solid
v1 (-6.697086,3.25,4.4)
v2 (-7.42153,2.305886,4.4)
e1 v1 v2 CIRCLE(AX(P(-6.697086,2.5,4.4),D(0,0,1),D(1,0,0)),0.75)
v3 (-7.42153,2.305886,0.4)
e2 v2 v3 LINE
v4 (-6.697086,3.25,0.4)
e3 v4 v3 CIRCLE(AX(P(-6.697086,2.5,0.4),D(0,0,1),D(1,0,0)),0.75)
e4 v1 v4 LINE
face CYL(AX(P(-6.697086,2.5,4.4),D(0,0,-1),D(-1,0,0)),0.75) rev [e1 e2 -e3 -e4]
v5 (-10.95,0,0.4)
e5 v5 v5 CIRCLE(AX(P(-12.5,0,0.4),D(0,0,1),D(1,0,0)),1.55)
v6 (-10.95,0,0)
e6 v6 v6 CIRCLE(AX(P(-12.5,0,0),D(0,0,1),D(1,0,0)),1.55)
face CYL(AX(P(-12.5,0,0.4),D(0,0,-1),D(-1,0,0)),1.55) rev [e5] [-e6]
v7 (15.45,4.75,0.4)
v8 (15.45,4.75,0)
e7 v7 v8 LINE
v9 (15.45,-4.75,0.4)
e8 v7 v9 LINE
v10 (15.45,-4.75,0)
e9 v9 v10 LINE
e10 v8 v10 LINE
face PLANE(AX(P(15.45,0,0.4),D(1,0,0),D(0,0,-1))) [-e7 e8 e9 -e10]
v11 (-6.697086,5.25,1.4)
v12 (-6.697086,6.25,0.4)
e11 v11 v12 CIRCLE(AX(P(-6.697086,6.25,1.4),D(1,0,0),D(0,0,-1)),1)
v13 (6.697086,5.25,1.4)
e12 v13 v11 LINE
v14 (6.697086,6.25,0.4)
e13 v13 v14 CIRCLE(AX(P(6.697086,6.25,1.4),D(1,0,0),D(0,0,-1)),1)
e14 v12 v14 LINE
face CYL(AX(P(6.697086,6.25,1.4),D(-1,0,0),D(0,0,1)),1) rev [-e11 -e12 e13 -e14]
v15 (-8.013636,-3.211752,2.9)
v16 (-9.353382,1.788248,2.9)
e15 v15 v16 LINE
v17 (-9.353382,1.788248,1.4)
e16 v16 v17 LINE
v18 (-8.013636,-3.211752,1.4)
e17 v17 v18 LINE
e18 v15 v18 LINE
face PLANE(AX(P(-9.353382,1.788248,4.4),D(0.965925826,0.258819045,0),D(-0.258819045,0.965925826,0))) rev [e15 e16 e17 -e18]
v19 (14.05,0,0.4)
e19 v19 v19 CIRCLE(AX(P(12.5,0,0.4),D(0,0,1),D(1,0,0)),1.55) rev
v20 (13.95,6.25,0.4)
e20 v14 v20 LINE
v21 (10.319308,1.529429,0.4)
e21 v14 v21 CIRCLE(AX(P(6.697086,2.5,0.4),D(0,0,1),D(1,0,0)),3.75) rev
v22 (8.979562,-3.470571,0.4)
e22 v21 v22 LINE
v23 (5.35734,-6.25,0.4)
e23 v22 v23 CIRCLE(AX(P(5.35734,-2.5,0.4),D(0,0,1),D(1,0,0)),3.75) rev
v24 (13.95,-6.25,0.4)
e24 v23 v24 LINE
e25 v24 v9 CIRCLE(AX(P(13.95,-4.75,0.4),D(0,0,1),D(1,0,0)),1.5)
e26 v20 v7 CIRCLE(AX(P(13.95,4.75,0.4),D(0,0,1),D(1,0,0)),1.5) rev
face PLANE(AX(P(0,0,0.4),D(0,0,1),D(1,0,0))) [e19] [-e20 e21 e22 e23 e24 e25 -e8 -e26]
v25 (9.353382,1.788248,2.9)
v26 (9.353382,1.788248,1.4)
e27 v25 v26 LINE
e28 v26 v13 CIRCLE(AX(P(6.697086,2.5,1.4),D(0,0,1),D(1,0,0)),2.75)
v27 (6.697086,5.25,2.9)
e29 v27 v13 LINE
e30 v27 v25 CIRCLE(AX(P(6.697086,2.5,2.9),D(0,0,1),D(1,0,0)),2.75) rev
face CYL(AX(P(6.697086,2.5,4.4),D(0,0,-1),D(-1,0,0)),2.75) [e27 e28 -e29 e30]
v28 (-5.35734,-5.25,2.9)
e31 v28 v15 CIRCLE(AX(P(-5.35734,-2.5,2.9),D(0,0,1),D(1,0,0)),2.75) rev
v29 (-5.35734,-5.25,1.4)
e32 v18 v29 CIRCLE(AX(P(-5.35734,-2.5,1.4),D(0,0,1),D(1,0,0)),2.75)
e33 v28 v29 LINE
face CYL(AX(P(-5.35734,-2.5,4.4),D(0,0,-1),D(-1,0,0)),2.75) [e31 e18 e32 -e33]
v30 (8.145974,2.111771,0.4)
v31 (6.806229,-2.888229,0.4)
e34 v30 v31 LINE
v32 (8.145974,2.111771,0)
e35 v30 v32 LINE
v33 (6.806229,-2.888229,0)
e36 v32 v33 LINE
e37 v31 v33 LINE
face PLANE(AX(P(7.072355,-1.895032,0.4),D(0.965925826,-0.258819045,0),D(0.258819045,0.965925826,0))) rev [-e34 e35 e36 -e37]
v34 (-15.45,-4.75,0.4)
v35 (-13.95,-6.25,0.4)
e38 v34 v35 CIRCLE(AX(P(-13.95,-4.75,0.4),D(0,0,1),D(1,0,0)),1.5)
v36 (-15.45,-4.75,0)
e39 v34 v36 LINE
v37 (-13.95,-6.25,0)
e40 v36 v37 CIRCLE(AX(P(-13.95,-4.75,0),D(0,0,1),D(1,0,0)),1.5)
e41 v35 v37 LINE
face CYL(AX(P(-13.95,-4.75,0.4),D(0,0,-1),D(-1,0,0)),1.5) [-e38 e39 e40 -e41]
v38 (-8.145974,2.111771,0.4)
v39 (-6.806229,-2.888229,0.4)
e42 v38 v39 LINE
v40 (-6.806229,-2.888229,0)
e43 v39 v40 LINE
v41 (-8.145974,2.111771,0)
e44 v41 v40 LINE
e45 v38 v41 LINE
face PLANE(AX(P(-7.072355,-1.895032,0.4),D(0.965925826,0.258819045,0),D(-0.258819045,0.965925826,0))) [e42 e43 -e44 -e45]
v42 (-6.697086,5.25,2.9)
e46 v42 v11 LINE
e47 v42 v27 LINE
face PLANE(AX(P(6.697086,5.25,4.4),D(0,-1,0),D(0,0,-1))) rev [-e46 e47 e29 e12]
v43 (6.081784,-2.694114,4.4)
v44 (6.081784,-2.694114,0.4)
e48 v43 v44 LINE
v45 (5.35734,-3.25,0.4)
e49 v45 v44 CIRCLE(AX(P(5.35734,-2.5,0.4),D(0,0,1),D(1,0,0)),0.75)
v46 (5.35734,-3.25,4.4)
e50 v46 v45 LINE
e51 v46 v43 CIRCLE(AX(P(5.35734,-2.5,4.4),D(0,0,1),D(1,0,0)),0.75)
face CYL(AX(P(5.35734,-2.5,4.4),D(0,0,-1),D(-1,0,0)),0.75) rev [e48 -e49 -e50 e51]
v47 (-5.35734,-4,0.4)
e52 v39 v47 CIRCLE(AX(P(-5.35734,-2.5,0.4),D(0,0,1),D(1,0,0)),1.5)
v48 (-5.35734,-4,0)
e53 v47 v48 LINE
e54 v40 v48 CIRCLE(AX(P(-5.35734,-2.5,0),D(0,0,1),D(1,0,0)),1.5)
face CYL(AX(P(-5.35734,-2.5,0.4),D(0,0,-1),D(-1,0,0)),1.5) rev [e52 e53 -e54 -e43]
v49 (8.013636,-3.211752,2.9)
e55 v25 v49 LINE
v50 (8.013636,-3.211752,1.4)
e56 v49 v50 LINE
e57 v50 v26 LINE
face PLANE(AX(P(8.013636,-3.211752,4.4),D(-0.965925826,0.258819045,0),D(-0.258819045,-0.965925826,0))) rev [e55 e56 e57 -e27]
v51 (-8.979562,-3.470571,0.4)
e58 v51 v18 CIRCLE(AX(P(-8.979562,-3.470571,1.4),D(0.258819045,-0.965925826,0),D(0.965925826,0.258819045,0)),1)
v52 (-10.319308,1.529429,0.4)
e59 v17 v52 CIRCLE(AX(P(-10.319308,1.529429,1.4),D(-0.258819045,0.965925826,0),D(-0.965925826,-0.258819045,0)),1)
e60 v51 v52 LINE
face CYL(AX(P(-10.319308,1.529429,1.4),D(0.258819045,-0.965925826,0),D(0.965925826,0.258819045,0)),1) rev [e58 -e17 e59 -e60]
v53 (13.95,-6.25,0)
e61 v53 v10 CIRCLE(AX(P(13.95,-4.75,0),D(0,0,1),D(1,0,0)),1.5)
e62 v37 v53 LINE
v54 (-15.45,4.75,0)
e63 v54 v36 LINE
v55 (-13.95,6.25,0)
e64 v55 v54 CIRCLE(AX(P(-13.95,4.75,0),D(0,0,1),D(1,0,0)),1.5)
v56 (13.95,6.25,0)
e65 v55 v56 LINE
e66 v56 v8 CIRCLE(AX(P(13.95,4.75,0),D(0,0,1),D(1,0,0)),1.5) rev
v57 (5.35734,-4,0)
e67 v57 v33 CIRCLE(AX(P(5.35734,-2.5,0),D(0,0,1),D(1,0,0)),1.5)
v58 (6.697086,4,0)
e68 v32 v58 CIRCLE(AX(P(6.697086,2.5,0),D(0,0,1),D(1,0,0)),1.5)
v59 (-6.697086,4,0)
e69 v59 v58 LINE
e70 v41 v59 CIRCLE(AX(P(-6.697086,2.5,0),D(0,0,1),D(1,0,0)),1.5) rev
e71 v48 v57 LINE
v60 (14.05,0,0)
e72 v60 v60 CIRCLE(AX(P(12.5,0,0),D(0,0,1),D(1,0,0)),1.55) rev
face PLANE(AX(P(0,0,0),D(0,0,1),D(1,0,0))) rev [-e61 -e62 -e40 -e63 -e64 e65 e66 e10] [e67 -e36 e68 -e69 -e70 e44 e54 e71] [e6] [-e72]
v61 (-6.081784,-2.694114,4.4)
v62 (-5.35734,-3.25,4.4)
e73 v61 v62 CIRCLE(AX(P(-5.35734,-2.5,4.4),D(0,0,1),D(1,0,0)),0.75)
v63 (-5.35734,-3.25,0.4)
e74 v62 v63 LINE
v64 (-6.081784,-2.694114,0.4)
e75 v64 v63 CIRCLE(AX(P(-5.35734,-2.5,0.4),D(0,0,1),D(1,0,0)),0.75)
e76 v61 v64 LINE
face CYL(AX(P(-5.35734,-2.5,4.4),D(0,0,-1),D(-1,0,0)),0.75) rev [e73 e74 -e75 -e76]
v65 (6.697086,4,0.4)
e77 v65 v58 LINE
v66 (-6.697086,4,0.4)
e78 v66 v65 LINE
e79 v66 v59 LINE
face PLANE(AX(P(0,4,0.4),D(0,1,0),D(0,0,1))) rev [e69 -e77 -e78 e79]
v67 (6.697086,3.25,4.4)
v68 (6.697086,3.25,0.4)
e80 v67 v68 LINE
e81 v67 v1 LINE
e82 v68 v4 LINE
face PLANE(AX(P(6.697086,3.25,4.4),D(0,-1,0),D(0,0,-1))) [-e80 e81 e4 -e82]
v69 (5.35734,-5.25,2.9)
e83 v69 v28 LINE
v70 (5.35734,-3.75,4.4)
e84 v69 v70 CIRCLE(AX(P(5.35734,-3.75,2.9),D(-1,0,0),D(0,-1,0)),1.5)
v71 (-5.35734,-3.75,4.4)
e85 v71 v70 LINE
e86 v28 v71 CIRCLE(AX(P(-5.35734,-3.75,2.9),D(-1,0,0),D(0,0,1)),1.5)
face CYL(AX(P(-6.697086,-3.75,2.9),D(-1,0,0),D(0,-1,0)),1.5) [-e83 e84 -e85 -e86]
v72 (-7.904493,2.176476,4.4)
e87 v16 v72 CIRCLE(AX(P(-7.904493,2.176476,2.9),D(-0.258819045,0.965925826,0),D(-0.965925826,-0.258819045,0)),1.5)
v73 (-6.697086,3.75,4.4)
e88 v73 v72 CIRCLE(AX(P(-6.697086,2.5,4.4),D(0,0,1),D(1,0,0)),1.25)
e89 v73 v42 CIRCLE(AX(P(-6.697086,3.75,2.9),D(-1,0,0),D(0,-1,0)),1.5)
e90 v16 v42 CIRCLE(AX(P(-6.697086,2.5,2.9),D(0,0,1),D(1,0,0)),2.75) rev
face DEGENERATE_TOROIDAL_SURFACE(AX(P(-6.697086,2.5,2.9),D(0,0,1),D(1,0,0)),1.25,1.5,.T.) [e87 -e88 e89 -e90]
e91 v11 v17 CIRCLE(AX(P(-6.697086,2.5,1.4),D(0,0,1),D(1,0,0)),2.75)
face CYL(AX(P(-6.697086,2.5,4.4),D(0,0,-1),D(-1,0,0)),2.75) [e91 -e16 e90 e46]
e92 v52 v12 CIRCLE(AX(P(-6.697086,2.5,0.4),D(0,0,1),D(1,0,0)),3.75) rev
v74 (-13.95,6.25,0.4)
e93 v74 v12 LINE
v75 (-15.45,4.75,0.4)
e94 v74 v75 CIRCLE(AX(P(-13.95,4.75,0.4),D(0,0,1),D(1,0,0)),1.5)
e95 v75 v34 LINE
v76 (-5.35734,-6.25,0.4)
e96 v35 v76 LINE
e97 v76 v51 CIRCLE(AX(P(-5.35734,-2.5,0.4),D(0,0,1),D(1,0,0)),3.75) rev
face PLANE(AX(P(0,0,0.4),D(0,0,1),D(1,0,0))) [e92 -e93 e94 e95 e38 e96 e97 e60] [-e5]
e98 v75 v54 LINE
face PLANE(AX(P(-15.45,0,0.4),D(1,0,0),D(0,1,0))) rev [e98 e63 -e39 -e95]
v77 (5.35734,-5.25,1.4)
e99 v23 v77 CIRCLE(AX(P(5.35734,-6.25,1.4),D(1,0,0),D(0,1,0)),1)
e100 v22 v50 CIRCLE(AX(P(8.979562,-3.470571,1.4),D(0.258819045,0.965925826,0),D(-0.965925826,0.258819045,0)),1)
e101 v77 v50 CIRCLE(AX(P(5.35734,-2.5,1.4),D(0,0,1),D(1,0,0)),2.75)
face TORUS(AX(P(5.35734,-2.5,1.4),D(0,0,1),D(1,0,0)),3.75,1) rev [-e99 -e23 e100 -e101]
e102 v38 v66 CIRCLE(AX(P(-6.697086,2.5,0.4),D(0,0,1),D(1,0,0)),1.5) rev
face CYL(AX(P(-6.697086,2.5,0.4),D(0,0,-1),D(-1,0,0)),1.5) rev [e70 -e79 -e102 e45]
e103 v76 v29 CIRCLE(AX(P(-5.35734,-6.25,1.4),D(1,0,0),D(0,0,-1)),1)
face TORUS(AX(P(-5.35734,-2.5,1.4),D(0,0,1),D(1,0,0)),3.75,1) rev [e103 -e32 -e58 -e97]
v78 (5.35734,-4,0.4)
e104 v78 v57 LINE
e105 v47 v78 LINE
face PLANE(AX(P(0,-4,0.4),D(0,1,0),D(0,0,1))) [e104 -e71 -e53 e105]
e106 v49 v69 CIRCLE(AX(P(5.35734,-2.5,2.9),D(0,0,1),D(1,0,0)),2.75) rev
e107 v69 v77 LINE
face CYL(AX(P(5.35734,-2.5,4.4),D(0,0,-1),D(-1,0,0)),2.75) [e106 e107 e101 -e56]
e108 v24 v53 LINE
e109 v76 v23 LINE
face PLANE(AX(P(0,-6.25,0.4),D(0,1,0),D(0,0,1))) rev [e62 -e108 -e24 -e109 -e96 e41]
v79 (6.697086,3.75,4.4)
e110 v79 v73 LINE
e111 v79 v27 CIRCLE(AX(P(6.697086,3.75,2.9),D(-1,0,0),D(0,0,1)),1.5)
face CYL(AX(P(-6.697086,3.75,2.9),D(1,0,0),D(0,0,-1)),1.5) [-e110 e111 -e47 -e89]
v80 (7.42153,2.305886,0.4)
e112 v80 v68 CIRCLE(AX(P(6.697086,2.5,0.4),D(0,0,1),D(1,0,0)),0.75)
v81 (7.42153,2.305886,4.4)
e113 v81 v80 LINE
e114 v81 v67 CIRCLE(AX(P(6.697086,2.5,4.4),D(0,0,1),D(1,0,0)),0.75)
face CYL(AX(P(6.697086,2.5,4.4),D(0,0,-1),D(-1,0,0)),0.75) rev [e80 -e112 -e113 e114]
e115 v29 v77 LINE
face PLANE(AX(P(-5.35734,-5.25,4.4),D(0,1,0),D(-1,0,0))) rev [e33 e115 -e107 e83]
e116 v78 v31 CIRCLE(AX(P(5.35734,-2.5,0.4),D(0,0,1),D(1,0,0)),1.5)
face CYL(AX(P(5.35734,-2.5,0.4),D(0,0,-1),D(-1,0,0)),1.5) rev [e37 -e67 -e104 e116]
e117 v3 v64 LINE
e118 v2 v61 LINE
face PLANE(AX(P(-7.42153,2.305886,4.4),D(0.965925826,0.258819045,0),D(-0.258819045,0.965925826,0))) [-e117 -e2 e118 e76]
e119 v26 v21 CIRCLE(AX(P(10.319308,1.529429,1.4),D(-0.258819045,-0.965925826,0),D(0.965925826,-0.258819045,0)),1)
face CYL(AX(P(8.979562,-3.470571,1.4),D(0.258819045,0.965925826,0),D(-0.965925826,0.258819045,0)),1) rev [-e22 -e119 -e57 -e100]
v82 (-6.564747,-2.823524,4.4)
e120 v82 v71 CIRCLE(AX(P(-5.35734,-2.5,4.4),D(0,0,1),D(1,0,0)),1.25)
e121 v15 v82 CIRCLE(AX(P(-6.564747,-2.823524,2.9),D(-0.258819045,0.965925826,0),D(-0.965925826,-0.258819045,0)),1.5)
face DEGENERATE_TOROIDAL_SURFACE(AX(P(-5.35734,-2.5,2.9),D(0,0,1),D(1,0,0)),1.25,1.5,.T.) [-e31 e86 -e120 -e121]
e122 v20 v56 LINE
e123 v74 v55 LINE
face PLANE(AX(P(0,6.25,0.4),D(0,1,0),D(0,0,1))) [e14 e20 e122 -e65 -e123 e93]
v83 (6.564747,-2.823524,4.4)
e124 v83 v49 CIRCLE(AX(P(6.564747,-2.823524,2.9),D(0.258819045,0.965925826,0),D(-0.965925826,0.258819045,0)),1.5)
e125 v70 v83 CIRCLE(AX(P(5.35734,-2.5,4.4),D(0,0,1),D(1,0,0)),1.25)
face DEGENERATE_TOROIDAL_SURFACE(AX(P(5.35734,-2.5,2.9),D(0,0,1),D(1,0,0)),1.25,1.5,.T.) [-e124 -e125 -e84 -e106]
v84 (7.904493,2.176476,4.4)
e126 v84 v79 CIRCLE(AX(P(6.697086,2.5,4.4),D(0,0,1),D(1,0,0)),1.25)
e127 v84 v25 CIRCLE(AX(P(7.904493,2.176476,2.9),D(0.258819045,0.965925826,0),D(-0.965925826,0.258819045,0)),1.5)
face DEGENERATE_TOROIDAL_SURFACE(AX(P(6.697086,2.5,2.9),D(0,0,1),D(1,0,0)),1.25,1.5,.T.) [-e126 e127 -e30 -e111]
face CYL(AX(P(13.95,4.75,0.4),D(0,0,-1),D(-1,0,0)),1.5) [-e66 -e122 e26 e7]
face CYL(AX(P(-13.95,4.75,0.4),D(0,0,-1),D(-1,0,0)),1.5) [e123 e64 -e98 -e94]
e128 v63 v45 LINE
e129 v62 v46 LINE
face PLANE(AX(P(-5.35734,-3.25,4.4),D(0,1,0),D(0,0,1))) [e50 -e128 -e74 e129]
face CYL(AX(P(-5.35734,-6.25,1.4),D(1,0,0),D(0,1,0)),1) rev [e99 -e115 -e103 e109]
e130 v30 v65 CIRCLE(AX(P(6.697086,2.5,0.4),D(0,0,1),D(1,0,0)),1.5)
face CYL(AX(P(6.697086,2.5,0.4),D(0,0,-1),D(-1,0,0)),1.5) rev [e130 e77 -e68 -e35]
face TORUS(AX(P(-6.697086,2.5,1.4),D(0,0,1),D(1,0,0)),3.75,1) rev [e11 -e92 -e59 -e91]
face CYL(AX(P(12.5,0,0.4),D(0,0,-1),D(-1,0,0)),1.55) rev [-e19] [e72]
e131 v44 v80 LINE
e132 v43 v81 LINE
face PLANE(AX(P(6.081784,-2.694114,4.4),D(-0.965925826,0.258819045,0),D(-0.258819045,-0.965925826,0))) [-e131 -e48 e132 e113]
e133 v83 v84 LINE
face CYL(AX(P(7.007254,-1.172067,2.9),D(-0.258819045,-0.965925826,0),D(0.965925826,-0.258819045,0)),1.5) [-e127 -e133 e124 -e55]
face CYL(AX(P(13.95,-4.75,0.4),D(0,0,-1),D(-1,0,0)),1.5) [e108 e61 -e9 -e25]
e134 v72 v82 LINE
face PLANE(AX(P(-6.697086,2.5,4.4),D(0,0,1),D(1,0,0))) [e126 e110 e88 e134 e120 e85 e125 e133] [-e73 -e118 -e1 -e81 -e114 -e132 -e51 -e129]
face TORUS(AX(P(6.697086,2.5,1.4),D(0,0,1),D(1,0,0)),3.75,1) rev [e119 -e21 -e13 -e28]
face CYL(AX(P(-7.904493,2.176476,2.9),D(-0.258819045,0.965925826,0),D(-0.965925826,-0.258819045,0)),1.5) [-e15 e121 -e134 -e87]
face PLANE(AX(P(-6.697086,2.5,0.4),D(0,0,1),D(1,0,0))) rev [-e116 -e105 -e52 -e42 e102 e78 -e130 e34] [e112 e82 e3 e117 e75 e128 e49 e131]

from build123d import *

# Parameters (mm, degrees)
SKETCH1_R           = 1.55
BOSS_EXTRUDE1_DEPTH = 0.4
BOSS_EXTRUDE2_DEPTH = 4
FILLET1_R           = 1
FILLET2_R           = 1.5


with BuildPart() as part:
    # Sketch1 → Boss-Extrude1 (new body)
    with BuildSketch(Plane.XY):
        with BuildLine():
            Line((13.95, 6.25), (-13.95, 6.25))
            ThreePointArc((-13.95, 6.25), (-15.010660172, 5.810660172), (-15.45, 4.75))
            Line((-15.45, 4.75), (-15.45, -4.75))
            ThreePointArc((-15.45, -4.75), (-15.010660172, -5.810660172), (-13.95, -6.25))
            Line((-13.95, -6.25), (13.95, -6.25))
            ThreePointArc((13.95, -6.25), (15.010660172, -5.810660172), (15.45, -4.75))
            Line((15.45, -4.75), (15.45, 4.75))
            ThreePointArc((15.45, 4.75), (15.010660172, 5.810660172), (13.95, 6.25))
        make_face()
        with Locations((-12.5, 0)):
            Circle(SKETCH1_R, mode=Mode.SUBTRACT)
        with BuildLine():
            Line((-6.806228507, -2.888228568), (-8.145974469, 2.111771432))
            ThreePointArc((-8.145974469, 2.111771432), (-7.88711574, 3.413142144), (-6.697085729, 4))
            Line((-6.697085729, 4), (6.697085729, 4))
            ThreePointArc((6.697085729, 4), (7.88711574, 3.413142144), (8.145974469, 2.111771432))
            Line((8.145974469, 2.111771432), (6.806228507, -2.888228568))
            ThreePointArc((6.806228507, -2.888228568), (6.270481911, -3.69003001), (5.357339767, -4))
            Line((5.357339767, -4), (-5.357339767, -4))
            ThreePointArc((-5.357339767, -4), (-6.270481911, -3.69003001), (-6.806228507, -2.888228568))
        make_face(mode=Mode.SUBTRACT)
        with Locations((12.5, 0)):
            Circle(SKETCH1_R, mode=Mode.SUBTRACT)
    extrude(amount=BOSS_EXTRUDE1_DEPTH)

    # Sketch2 → Boss-Extrude2 (add)
    with BuildSketch(Plane.XY.offset(0.4)):
        with BuildLine():
            Line((-9.353381752, 1.788247626), (-8.01363579, -3.211752374))
            ThreePointArc((-8.01363579, -3.211752374), (-7.031433697, -4.681721686), (-5.357339767, -5.25))
            Line((-5.357339767, -5.25), (5.357339767, -5.25))
            ThreePointArc((5.357339767, -5.25), (7.031433697, -4.681721686), (8.01363579, -3.211752374))
            Line((8.01363579, -3.211752374), (9.353381752, 1.788247626))
            ThreePointArc((9.353381752, 1.788247626), (8.878807415, 4.17409393), (6.697085729, 5.25))
            Line((6.697085729, 5.25), (-6.697085729, 5.25))
            ThreePointArc((-6.697085729, 5.25), (-8.878807415, 4.17409393), (-9.353381752, 1.788247626))
        make_face()
        with BuildLine():
            Line((-5.357339767, -3.25), (5.357339767, -3.25))
            ThreePointArc((5.357339767, -3.25), (5.813910839, -3.095015005), (6.081784137, -2.694114284))
            Line((6.081784137, -2.694114284), (7.421530099, 2.305885716))
            ThreePointArc((7.421530099, 2.305885716), (7.292100735, 2.956571072), (6.697085729, 3.25))
            Line((6.697085729, 3.25), (-6.697085729, 3.25))
            ThreePointArc((-6.697085729, 3.25), (-7.292100735, 2.956571072), (-7.421530099, 2.305885716))
            Line((-7.421530099, 2.305885716), (-6.081784137, -2.694114284))
            ThreePointArc((-6.081784137, -2.694114284), (-5.813910839, -3.095015005), (-5.357339767, -3.25))
        make_face(mode=Mode.SUBTRACT)
    extrude(amount=BOSS_EXTRUDE2_DEPTH)

    # Fillet1
    fillet1_edges = [part.edges().sort_by_distance(p)[0] for p in [
        (-8.878807415, 4.17409393, 0.4),
        (-8.683508771, -0.711752374, 0.4),
        (-7.031433697, -4.681721686, 0.4),
        (0, -5.25, 0.4),
        (7.031433697, -4.681721686, 0.4),
        (8.683508771, -0.711752374, 0.4),
        (8.878807415, 4.17409393, 0.4),
        (0, 5.25, 0.4),
    ]]
    fillet(fillet1_edges, radius=FILLET1_R - 0.0001)  # a hair under: the kernel refuses the full size

    # Fillet2
    fillet2_edges = [part.edges().sort_by_distance(p)[0] for p in [
        (-8.878807415, 4.17409393, 4.4),
        (-8.683508771, -0.711752374, 4.4),
        (-7.031433697, -4.681721686, 4.4),
        (0, -5.25, 4.4),
        (7.031433697, -4.681721686, 4.4),
        (8.683508771, -0.711752374, 4.4),
        (8.878807415, 4.17409393, 4.4),
        (0, 5.25, 4.4),
    ]]
    fillet(fillet2_edges, radius=FILLET2_R)


solid = part.part
